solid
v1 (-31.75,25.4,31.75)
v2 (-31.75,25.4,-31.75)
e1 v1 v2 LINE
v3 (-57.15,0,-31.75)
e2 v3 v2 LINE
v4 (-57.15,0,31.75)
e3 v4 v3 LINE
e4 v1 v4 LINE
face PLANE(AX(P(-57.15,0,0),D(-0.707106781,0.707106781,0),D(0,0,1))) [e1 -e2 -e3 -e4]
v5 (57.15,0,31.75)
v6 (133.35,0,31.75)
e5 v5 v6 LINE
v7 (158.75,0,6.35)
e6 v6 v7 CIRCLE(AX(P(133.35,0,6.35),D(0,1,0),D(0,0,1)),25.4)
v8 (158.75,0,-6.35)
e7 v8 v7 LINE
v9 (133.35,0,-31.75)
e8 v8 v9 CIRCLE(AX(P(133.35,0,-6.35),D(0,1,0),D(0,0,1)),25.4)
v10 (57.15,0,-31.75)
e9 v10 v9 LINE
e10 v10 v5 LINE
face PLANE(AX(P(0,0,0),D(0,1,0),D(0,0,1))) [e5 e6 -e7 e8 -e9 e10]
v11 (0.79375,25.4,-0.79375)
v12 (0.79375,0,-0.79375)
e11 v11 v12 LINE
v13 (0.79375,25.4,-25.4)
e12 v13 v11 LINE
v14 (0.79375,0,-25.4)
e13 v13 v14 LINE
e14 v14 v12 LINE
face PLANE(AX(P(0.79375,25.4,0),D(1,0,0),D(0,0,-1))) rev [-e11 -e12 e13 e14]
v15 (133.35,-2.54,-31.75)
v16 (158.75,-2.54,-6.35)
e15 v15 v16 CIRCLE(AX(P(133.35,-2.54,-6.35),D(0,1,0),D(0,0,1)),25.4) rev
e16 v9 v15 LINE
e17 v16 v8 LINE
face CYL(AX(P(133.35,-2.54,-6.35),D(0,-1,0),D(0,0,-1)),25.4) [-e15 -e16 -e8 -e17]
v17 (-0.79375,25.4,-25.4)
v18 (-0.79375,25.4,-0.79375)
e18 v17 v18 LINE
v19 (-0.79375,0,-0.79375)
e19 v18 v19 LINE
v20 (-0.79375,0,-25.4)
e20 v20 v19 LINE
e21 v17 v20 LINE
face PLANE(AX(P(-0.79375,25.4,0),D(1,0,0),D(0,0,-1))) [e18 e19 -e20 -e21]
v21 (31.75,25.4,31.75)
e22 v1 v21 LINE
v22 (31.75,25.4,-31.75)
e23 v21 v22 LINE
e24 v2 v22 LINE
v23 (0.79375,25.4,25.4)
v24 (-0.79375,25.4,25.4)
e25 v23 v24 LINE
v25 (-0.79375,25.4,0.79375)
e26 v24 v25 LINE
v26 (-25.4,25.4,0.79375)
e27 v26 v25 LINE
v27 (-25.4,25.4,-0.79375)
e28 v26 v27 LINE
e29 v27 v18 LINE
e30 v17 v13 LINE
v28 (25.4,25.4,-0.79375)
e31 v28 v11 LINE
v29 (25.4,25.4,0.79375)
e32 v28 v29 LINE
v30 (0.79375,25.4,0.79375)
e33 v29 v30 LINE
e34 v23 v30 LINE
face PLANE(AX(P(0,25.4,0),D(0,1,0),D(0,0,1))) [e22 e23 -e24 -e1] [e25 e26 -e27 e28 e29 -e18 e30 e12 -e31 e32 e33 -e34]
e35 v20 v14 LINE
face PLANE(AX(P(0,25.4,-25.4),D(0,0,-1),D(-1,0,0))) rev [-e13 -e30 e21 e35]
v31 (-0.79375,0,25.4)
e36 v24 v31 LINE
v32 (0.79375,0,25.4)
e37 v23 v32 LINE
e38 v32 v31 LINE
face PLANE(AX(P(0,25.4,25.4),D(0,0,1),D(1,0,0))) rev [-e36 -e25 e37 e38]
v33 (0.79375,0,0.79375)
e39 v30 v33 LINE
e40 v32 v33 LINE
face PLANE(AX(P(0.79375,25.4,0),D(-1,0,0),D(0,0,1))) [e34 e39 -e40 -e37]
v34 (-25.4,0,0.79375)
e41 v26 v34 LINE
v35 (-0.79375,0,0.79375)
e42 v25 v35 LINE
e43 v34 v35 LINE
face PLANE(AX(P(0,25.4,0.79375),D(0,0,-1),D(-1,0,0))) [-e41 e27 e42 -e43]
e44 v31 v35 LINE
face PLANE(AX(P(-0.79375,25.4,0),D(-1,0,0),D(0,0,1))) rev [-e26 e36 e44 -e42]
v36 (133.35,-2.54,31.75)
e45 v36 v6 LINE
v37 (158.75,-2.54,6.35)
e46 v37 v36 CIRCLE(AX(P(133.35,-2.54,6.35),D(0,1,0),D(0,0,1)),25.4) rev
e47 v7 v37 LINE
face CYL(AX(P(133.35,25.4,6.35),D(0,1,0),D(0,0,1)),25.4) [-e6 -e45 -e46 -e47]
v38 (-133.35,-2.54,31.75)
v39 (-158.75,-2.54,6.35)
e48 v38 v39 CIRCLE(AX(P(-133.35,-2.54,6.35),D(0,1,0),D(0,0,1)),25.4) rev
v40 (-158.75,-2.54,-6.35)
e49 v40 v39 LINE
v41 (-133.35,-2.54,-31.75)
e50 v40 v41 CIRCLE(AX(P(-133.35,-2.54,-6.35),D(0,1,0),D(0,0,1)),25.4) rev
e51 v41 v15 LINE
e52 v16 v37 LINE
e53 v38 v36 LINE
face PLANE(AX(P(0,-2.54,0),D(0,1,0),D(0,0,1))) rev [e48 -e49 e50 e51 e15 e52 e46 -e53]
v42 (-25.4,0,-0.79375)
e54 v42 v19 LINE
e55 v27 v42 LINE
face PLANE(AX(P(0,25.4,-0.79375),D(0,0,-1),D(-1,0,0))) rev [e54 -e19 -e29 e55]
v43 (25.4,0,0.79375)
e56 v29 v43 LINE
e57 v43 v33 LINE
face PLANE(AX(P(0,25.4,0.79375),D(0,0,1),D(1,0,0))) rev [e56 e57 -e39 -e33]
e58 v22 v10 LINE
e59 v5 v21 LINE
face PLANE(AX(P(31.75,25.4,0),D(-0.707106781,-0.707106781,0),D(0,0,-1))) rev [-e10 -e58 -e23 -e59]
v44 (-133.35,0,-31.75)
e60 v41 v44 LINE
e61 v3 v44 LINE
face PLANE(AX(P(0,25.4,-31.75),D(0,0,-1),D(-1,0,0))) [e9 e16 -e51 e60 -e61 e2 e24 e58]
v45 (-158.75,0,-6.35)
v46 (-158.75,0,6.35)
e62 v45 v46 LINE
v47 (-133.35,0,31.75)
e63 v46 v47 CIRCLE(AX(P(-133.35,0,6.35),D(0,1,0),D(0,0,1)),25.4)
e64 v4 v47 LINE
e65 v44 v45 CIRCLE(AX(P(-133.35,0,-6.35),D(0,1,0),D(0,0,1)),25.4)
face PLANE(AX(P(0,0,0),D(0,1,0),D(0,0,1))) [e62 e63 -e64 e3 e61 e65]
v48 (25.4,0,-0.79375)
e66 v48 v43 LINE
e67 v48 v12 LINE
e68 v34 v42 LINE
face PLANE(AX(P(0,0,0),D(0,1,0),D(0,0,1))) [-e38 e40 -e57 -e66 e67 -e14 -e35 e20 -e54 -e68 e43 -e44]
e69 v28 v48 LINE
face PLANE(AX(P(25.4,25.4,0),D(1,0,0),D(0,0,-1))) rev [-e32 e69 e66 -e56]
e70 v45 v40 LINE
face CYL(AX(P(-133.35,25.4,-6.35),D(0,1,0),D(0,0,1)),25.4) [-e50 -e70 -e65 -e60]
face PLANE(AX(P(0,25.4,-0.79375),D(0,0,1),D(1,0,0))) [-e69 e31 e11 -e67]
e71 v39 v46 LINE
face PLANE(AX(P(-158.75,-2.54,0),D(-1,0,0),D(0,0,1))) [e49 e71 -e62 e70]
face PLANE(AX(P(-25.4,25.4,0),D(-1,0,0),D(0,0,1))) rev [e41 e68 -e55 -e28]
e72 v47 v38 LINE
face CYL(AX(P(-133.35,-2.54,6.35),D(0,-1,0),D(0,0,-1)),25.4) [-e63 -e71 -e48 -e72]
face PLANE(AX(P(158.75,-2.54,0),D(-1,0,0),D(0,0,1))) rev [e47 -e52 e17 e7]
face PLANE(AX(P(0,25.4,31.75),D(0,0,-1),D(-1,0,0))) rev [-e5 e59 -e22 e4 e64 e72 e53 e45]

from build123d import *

# Parameters (mm, degrees)
SKETCH1_W           = 63.5
SKETCH1_H           = 63.5
BOSS_EXTRUDE1_DEPTH = 25.4
SKETCH1_3_W         = 63.5
SKETCH1_3_H         = 63.5
BOSS_EXTRUDE2_DEPTH = 2.54
SKETCH1_4_W         = 127
SKETCH1_4_H         = 63.5
BOSS_EXTRUDE3_DEPTH = 2.54
CHAMFER2_SIZE       = 25.4
FILLET1_R           = 25.4


with BuildPart() as part:
    # Sketch1 → Boss-Extrude1 (new body)
    with BuildSketch(Plane(origin=(0, 0, 0), x_dir=(1, 0, 0), z_dir=(0, 1, 0))):
        Rectangle(SKETCH1_W, SKETCH1_H)
        Polygon((-0.79375, 25.4), (-0.79375, 0.79375), (-25.4, 0.79375), (-25.4, -0.79375), (-0.79375, -0.79375), (-0.79375, -25.4), (0.79375, -25.4), (0.79375, -0.79375), (25.4, -0.79375), (25.4, 0.79375), (0.79375, 0.79375), (0.79375, 25.4), align=None, mode=Mode.SUBTRACT)
    extrude(amount=BOSS_EXTRUDE1_DEPTH)

    # Sketch1<3> → Boss-Extrude2 (add)
    with BuildSketch(Plane(origin=(0, 0, 0), x_dir=(1, 0, 0), z_dir=(0, 1, 0))):
        Rectangle(SKETCH1_3_W, SKETCH1_3_H)
    extrude(amount=-BOSS_EXTRUDE2_DEPTH)

    # Sketch1<4> → Boss-Extrude3 (add)
    with BuildSketch(Plane(origin=(0, 0, 0), x_dir=(1, 0, 0), z_dir=(0, 1, 0))):
        with Locations((95.25, 0)):
            Rectangle(SKETCH1_4_W, SKETCH1_4_H)
        with Locations((-95.25, 0)):
            Rectangle(SKETCH1_4_W, SKETCH1_4_H)
    extrude(amount=-BOSS_EXTRUDE3_DEPTH)

    # Chamfer2
    chamfer2_edges = [part.edges().sort_by_distance(p)[0] for p in [
        (31.75, 0, 0),
        (-31.75, 0, 0),
    ]]
    chamfer(chamfer2_edges, length=CHAMFER2_SIZE - 0.0001)  # a hair under: the kernel refuses the full size

    # Fillet1
    fillet1_edges = [part.edges().sort_by_distance(p)[0] for p in [
        (158.75, -1.27, -31.75),
        (158.75, -1.27, 31.75),
        (-158.75, -1.27, -31.75),
        (-158.75, -1.27, 31.75),
    ]]
    fillet(fillet1_edges, radius=FILLET1_R)


solid = part.part
